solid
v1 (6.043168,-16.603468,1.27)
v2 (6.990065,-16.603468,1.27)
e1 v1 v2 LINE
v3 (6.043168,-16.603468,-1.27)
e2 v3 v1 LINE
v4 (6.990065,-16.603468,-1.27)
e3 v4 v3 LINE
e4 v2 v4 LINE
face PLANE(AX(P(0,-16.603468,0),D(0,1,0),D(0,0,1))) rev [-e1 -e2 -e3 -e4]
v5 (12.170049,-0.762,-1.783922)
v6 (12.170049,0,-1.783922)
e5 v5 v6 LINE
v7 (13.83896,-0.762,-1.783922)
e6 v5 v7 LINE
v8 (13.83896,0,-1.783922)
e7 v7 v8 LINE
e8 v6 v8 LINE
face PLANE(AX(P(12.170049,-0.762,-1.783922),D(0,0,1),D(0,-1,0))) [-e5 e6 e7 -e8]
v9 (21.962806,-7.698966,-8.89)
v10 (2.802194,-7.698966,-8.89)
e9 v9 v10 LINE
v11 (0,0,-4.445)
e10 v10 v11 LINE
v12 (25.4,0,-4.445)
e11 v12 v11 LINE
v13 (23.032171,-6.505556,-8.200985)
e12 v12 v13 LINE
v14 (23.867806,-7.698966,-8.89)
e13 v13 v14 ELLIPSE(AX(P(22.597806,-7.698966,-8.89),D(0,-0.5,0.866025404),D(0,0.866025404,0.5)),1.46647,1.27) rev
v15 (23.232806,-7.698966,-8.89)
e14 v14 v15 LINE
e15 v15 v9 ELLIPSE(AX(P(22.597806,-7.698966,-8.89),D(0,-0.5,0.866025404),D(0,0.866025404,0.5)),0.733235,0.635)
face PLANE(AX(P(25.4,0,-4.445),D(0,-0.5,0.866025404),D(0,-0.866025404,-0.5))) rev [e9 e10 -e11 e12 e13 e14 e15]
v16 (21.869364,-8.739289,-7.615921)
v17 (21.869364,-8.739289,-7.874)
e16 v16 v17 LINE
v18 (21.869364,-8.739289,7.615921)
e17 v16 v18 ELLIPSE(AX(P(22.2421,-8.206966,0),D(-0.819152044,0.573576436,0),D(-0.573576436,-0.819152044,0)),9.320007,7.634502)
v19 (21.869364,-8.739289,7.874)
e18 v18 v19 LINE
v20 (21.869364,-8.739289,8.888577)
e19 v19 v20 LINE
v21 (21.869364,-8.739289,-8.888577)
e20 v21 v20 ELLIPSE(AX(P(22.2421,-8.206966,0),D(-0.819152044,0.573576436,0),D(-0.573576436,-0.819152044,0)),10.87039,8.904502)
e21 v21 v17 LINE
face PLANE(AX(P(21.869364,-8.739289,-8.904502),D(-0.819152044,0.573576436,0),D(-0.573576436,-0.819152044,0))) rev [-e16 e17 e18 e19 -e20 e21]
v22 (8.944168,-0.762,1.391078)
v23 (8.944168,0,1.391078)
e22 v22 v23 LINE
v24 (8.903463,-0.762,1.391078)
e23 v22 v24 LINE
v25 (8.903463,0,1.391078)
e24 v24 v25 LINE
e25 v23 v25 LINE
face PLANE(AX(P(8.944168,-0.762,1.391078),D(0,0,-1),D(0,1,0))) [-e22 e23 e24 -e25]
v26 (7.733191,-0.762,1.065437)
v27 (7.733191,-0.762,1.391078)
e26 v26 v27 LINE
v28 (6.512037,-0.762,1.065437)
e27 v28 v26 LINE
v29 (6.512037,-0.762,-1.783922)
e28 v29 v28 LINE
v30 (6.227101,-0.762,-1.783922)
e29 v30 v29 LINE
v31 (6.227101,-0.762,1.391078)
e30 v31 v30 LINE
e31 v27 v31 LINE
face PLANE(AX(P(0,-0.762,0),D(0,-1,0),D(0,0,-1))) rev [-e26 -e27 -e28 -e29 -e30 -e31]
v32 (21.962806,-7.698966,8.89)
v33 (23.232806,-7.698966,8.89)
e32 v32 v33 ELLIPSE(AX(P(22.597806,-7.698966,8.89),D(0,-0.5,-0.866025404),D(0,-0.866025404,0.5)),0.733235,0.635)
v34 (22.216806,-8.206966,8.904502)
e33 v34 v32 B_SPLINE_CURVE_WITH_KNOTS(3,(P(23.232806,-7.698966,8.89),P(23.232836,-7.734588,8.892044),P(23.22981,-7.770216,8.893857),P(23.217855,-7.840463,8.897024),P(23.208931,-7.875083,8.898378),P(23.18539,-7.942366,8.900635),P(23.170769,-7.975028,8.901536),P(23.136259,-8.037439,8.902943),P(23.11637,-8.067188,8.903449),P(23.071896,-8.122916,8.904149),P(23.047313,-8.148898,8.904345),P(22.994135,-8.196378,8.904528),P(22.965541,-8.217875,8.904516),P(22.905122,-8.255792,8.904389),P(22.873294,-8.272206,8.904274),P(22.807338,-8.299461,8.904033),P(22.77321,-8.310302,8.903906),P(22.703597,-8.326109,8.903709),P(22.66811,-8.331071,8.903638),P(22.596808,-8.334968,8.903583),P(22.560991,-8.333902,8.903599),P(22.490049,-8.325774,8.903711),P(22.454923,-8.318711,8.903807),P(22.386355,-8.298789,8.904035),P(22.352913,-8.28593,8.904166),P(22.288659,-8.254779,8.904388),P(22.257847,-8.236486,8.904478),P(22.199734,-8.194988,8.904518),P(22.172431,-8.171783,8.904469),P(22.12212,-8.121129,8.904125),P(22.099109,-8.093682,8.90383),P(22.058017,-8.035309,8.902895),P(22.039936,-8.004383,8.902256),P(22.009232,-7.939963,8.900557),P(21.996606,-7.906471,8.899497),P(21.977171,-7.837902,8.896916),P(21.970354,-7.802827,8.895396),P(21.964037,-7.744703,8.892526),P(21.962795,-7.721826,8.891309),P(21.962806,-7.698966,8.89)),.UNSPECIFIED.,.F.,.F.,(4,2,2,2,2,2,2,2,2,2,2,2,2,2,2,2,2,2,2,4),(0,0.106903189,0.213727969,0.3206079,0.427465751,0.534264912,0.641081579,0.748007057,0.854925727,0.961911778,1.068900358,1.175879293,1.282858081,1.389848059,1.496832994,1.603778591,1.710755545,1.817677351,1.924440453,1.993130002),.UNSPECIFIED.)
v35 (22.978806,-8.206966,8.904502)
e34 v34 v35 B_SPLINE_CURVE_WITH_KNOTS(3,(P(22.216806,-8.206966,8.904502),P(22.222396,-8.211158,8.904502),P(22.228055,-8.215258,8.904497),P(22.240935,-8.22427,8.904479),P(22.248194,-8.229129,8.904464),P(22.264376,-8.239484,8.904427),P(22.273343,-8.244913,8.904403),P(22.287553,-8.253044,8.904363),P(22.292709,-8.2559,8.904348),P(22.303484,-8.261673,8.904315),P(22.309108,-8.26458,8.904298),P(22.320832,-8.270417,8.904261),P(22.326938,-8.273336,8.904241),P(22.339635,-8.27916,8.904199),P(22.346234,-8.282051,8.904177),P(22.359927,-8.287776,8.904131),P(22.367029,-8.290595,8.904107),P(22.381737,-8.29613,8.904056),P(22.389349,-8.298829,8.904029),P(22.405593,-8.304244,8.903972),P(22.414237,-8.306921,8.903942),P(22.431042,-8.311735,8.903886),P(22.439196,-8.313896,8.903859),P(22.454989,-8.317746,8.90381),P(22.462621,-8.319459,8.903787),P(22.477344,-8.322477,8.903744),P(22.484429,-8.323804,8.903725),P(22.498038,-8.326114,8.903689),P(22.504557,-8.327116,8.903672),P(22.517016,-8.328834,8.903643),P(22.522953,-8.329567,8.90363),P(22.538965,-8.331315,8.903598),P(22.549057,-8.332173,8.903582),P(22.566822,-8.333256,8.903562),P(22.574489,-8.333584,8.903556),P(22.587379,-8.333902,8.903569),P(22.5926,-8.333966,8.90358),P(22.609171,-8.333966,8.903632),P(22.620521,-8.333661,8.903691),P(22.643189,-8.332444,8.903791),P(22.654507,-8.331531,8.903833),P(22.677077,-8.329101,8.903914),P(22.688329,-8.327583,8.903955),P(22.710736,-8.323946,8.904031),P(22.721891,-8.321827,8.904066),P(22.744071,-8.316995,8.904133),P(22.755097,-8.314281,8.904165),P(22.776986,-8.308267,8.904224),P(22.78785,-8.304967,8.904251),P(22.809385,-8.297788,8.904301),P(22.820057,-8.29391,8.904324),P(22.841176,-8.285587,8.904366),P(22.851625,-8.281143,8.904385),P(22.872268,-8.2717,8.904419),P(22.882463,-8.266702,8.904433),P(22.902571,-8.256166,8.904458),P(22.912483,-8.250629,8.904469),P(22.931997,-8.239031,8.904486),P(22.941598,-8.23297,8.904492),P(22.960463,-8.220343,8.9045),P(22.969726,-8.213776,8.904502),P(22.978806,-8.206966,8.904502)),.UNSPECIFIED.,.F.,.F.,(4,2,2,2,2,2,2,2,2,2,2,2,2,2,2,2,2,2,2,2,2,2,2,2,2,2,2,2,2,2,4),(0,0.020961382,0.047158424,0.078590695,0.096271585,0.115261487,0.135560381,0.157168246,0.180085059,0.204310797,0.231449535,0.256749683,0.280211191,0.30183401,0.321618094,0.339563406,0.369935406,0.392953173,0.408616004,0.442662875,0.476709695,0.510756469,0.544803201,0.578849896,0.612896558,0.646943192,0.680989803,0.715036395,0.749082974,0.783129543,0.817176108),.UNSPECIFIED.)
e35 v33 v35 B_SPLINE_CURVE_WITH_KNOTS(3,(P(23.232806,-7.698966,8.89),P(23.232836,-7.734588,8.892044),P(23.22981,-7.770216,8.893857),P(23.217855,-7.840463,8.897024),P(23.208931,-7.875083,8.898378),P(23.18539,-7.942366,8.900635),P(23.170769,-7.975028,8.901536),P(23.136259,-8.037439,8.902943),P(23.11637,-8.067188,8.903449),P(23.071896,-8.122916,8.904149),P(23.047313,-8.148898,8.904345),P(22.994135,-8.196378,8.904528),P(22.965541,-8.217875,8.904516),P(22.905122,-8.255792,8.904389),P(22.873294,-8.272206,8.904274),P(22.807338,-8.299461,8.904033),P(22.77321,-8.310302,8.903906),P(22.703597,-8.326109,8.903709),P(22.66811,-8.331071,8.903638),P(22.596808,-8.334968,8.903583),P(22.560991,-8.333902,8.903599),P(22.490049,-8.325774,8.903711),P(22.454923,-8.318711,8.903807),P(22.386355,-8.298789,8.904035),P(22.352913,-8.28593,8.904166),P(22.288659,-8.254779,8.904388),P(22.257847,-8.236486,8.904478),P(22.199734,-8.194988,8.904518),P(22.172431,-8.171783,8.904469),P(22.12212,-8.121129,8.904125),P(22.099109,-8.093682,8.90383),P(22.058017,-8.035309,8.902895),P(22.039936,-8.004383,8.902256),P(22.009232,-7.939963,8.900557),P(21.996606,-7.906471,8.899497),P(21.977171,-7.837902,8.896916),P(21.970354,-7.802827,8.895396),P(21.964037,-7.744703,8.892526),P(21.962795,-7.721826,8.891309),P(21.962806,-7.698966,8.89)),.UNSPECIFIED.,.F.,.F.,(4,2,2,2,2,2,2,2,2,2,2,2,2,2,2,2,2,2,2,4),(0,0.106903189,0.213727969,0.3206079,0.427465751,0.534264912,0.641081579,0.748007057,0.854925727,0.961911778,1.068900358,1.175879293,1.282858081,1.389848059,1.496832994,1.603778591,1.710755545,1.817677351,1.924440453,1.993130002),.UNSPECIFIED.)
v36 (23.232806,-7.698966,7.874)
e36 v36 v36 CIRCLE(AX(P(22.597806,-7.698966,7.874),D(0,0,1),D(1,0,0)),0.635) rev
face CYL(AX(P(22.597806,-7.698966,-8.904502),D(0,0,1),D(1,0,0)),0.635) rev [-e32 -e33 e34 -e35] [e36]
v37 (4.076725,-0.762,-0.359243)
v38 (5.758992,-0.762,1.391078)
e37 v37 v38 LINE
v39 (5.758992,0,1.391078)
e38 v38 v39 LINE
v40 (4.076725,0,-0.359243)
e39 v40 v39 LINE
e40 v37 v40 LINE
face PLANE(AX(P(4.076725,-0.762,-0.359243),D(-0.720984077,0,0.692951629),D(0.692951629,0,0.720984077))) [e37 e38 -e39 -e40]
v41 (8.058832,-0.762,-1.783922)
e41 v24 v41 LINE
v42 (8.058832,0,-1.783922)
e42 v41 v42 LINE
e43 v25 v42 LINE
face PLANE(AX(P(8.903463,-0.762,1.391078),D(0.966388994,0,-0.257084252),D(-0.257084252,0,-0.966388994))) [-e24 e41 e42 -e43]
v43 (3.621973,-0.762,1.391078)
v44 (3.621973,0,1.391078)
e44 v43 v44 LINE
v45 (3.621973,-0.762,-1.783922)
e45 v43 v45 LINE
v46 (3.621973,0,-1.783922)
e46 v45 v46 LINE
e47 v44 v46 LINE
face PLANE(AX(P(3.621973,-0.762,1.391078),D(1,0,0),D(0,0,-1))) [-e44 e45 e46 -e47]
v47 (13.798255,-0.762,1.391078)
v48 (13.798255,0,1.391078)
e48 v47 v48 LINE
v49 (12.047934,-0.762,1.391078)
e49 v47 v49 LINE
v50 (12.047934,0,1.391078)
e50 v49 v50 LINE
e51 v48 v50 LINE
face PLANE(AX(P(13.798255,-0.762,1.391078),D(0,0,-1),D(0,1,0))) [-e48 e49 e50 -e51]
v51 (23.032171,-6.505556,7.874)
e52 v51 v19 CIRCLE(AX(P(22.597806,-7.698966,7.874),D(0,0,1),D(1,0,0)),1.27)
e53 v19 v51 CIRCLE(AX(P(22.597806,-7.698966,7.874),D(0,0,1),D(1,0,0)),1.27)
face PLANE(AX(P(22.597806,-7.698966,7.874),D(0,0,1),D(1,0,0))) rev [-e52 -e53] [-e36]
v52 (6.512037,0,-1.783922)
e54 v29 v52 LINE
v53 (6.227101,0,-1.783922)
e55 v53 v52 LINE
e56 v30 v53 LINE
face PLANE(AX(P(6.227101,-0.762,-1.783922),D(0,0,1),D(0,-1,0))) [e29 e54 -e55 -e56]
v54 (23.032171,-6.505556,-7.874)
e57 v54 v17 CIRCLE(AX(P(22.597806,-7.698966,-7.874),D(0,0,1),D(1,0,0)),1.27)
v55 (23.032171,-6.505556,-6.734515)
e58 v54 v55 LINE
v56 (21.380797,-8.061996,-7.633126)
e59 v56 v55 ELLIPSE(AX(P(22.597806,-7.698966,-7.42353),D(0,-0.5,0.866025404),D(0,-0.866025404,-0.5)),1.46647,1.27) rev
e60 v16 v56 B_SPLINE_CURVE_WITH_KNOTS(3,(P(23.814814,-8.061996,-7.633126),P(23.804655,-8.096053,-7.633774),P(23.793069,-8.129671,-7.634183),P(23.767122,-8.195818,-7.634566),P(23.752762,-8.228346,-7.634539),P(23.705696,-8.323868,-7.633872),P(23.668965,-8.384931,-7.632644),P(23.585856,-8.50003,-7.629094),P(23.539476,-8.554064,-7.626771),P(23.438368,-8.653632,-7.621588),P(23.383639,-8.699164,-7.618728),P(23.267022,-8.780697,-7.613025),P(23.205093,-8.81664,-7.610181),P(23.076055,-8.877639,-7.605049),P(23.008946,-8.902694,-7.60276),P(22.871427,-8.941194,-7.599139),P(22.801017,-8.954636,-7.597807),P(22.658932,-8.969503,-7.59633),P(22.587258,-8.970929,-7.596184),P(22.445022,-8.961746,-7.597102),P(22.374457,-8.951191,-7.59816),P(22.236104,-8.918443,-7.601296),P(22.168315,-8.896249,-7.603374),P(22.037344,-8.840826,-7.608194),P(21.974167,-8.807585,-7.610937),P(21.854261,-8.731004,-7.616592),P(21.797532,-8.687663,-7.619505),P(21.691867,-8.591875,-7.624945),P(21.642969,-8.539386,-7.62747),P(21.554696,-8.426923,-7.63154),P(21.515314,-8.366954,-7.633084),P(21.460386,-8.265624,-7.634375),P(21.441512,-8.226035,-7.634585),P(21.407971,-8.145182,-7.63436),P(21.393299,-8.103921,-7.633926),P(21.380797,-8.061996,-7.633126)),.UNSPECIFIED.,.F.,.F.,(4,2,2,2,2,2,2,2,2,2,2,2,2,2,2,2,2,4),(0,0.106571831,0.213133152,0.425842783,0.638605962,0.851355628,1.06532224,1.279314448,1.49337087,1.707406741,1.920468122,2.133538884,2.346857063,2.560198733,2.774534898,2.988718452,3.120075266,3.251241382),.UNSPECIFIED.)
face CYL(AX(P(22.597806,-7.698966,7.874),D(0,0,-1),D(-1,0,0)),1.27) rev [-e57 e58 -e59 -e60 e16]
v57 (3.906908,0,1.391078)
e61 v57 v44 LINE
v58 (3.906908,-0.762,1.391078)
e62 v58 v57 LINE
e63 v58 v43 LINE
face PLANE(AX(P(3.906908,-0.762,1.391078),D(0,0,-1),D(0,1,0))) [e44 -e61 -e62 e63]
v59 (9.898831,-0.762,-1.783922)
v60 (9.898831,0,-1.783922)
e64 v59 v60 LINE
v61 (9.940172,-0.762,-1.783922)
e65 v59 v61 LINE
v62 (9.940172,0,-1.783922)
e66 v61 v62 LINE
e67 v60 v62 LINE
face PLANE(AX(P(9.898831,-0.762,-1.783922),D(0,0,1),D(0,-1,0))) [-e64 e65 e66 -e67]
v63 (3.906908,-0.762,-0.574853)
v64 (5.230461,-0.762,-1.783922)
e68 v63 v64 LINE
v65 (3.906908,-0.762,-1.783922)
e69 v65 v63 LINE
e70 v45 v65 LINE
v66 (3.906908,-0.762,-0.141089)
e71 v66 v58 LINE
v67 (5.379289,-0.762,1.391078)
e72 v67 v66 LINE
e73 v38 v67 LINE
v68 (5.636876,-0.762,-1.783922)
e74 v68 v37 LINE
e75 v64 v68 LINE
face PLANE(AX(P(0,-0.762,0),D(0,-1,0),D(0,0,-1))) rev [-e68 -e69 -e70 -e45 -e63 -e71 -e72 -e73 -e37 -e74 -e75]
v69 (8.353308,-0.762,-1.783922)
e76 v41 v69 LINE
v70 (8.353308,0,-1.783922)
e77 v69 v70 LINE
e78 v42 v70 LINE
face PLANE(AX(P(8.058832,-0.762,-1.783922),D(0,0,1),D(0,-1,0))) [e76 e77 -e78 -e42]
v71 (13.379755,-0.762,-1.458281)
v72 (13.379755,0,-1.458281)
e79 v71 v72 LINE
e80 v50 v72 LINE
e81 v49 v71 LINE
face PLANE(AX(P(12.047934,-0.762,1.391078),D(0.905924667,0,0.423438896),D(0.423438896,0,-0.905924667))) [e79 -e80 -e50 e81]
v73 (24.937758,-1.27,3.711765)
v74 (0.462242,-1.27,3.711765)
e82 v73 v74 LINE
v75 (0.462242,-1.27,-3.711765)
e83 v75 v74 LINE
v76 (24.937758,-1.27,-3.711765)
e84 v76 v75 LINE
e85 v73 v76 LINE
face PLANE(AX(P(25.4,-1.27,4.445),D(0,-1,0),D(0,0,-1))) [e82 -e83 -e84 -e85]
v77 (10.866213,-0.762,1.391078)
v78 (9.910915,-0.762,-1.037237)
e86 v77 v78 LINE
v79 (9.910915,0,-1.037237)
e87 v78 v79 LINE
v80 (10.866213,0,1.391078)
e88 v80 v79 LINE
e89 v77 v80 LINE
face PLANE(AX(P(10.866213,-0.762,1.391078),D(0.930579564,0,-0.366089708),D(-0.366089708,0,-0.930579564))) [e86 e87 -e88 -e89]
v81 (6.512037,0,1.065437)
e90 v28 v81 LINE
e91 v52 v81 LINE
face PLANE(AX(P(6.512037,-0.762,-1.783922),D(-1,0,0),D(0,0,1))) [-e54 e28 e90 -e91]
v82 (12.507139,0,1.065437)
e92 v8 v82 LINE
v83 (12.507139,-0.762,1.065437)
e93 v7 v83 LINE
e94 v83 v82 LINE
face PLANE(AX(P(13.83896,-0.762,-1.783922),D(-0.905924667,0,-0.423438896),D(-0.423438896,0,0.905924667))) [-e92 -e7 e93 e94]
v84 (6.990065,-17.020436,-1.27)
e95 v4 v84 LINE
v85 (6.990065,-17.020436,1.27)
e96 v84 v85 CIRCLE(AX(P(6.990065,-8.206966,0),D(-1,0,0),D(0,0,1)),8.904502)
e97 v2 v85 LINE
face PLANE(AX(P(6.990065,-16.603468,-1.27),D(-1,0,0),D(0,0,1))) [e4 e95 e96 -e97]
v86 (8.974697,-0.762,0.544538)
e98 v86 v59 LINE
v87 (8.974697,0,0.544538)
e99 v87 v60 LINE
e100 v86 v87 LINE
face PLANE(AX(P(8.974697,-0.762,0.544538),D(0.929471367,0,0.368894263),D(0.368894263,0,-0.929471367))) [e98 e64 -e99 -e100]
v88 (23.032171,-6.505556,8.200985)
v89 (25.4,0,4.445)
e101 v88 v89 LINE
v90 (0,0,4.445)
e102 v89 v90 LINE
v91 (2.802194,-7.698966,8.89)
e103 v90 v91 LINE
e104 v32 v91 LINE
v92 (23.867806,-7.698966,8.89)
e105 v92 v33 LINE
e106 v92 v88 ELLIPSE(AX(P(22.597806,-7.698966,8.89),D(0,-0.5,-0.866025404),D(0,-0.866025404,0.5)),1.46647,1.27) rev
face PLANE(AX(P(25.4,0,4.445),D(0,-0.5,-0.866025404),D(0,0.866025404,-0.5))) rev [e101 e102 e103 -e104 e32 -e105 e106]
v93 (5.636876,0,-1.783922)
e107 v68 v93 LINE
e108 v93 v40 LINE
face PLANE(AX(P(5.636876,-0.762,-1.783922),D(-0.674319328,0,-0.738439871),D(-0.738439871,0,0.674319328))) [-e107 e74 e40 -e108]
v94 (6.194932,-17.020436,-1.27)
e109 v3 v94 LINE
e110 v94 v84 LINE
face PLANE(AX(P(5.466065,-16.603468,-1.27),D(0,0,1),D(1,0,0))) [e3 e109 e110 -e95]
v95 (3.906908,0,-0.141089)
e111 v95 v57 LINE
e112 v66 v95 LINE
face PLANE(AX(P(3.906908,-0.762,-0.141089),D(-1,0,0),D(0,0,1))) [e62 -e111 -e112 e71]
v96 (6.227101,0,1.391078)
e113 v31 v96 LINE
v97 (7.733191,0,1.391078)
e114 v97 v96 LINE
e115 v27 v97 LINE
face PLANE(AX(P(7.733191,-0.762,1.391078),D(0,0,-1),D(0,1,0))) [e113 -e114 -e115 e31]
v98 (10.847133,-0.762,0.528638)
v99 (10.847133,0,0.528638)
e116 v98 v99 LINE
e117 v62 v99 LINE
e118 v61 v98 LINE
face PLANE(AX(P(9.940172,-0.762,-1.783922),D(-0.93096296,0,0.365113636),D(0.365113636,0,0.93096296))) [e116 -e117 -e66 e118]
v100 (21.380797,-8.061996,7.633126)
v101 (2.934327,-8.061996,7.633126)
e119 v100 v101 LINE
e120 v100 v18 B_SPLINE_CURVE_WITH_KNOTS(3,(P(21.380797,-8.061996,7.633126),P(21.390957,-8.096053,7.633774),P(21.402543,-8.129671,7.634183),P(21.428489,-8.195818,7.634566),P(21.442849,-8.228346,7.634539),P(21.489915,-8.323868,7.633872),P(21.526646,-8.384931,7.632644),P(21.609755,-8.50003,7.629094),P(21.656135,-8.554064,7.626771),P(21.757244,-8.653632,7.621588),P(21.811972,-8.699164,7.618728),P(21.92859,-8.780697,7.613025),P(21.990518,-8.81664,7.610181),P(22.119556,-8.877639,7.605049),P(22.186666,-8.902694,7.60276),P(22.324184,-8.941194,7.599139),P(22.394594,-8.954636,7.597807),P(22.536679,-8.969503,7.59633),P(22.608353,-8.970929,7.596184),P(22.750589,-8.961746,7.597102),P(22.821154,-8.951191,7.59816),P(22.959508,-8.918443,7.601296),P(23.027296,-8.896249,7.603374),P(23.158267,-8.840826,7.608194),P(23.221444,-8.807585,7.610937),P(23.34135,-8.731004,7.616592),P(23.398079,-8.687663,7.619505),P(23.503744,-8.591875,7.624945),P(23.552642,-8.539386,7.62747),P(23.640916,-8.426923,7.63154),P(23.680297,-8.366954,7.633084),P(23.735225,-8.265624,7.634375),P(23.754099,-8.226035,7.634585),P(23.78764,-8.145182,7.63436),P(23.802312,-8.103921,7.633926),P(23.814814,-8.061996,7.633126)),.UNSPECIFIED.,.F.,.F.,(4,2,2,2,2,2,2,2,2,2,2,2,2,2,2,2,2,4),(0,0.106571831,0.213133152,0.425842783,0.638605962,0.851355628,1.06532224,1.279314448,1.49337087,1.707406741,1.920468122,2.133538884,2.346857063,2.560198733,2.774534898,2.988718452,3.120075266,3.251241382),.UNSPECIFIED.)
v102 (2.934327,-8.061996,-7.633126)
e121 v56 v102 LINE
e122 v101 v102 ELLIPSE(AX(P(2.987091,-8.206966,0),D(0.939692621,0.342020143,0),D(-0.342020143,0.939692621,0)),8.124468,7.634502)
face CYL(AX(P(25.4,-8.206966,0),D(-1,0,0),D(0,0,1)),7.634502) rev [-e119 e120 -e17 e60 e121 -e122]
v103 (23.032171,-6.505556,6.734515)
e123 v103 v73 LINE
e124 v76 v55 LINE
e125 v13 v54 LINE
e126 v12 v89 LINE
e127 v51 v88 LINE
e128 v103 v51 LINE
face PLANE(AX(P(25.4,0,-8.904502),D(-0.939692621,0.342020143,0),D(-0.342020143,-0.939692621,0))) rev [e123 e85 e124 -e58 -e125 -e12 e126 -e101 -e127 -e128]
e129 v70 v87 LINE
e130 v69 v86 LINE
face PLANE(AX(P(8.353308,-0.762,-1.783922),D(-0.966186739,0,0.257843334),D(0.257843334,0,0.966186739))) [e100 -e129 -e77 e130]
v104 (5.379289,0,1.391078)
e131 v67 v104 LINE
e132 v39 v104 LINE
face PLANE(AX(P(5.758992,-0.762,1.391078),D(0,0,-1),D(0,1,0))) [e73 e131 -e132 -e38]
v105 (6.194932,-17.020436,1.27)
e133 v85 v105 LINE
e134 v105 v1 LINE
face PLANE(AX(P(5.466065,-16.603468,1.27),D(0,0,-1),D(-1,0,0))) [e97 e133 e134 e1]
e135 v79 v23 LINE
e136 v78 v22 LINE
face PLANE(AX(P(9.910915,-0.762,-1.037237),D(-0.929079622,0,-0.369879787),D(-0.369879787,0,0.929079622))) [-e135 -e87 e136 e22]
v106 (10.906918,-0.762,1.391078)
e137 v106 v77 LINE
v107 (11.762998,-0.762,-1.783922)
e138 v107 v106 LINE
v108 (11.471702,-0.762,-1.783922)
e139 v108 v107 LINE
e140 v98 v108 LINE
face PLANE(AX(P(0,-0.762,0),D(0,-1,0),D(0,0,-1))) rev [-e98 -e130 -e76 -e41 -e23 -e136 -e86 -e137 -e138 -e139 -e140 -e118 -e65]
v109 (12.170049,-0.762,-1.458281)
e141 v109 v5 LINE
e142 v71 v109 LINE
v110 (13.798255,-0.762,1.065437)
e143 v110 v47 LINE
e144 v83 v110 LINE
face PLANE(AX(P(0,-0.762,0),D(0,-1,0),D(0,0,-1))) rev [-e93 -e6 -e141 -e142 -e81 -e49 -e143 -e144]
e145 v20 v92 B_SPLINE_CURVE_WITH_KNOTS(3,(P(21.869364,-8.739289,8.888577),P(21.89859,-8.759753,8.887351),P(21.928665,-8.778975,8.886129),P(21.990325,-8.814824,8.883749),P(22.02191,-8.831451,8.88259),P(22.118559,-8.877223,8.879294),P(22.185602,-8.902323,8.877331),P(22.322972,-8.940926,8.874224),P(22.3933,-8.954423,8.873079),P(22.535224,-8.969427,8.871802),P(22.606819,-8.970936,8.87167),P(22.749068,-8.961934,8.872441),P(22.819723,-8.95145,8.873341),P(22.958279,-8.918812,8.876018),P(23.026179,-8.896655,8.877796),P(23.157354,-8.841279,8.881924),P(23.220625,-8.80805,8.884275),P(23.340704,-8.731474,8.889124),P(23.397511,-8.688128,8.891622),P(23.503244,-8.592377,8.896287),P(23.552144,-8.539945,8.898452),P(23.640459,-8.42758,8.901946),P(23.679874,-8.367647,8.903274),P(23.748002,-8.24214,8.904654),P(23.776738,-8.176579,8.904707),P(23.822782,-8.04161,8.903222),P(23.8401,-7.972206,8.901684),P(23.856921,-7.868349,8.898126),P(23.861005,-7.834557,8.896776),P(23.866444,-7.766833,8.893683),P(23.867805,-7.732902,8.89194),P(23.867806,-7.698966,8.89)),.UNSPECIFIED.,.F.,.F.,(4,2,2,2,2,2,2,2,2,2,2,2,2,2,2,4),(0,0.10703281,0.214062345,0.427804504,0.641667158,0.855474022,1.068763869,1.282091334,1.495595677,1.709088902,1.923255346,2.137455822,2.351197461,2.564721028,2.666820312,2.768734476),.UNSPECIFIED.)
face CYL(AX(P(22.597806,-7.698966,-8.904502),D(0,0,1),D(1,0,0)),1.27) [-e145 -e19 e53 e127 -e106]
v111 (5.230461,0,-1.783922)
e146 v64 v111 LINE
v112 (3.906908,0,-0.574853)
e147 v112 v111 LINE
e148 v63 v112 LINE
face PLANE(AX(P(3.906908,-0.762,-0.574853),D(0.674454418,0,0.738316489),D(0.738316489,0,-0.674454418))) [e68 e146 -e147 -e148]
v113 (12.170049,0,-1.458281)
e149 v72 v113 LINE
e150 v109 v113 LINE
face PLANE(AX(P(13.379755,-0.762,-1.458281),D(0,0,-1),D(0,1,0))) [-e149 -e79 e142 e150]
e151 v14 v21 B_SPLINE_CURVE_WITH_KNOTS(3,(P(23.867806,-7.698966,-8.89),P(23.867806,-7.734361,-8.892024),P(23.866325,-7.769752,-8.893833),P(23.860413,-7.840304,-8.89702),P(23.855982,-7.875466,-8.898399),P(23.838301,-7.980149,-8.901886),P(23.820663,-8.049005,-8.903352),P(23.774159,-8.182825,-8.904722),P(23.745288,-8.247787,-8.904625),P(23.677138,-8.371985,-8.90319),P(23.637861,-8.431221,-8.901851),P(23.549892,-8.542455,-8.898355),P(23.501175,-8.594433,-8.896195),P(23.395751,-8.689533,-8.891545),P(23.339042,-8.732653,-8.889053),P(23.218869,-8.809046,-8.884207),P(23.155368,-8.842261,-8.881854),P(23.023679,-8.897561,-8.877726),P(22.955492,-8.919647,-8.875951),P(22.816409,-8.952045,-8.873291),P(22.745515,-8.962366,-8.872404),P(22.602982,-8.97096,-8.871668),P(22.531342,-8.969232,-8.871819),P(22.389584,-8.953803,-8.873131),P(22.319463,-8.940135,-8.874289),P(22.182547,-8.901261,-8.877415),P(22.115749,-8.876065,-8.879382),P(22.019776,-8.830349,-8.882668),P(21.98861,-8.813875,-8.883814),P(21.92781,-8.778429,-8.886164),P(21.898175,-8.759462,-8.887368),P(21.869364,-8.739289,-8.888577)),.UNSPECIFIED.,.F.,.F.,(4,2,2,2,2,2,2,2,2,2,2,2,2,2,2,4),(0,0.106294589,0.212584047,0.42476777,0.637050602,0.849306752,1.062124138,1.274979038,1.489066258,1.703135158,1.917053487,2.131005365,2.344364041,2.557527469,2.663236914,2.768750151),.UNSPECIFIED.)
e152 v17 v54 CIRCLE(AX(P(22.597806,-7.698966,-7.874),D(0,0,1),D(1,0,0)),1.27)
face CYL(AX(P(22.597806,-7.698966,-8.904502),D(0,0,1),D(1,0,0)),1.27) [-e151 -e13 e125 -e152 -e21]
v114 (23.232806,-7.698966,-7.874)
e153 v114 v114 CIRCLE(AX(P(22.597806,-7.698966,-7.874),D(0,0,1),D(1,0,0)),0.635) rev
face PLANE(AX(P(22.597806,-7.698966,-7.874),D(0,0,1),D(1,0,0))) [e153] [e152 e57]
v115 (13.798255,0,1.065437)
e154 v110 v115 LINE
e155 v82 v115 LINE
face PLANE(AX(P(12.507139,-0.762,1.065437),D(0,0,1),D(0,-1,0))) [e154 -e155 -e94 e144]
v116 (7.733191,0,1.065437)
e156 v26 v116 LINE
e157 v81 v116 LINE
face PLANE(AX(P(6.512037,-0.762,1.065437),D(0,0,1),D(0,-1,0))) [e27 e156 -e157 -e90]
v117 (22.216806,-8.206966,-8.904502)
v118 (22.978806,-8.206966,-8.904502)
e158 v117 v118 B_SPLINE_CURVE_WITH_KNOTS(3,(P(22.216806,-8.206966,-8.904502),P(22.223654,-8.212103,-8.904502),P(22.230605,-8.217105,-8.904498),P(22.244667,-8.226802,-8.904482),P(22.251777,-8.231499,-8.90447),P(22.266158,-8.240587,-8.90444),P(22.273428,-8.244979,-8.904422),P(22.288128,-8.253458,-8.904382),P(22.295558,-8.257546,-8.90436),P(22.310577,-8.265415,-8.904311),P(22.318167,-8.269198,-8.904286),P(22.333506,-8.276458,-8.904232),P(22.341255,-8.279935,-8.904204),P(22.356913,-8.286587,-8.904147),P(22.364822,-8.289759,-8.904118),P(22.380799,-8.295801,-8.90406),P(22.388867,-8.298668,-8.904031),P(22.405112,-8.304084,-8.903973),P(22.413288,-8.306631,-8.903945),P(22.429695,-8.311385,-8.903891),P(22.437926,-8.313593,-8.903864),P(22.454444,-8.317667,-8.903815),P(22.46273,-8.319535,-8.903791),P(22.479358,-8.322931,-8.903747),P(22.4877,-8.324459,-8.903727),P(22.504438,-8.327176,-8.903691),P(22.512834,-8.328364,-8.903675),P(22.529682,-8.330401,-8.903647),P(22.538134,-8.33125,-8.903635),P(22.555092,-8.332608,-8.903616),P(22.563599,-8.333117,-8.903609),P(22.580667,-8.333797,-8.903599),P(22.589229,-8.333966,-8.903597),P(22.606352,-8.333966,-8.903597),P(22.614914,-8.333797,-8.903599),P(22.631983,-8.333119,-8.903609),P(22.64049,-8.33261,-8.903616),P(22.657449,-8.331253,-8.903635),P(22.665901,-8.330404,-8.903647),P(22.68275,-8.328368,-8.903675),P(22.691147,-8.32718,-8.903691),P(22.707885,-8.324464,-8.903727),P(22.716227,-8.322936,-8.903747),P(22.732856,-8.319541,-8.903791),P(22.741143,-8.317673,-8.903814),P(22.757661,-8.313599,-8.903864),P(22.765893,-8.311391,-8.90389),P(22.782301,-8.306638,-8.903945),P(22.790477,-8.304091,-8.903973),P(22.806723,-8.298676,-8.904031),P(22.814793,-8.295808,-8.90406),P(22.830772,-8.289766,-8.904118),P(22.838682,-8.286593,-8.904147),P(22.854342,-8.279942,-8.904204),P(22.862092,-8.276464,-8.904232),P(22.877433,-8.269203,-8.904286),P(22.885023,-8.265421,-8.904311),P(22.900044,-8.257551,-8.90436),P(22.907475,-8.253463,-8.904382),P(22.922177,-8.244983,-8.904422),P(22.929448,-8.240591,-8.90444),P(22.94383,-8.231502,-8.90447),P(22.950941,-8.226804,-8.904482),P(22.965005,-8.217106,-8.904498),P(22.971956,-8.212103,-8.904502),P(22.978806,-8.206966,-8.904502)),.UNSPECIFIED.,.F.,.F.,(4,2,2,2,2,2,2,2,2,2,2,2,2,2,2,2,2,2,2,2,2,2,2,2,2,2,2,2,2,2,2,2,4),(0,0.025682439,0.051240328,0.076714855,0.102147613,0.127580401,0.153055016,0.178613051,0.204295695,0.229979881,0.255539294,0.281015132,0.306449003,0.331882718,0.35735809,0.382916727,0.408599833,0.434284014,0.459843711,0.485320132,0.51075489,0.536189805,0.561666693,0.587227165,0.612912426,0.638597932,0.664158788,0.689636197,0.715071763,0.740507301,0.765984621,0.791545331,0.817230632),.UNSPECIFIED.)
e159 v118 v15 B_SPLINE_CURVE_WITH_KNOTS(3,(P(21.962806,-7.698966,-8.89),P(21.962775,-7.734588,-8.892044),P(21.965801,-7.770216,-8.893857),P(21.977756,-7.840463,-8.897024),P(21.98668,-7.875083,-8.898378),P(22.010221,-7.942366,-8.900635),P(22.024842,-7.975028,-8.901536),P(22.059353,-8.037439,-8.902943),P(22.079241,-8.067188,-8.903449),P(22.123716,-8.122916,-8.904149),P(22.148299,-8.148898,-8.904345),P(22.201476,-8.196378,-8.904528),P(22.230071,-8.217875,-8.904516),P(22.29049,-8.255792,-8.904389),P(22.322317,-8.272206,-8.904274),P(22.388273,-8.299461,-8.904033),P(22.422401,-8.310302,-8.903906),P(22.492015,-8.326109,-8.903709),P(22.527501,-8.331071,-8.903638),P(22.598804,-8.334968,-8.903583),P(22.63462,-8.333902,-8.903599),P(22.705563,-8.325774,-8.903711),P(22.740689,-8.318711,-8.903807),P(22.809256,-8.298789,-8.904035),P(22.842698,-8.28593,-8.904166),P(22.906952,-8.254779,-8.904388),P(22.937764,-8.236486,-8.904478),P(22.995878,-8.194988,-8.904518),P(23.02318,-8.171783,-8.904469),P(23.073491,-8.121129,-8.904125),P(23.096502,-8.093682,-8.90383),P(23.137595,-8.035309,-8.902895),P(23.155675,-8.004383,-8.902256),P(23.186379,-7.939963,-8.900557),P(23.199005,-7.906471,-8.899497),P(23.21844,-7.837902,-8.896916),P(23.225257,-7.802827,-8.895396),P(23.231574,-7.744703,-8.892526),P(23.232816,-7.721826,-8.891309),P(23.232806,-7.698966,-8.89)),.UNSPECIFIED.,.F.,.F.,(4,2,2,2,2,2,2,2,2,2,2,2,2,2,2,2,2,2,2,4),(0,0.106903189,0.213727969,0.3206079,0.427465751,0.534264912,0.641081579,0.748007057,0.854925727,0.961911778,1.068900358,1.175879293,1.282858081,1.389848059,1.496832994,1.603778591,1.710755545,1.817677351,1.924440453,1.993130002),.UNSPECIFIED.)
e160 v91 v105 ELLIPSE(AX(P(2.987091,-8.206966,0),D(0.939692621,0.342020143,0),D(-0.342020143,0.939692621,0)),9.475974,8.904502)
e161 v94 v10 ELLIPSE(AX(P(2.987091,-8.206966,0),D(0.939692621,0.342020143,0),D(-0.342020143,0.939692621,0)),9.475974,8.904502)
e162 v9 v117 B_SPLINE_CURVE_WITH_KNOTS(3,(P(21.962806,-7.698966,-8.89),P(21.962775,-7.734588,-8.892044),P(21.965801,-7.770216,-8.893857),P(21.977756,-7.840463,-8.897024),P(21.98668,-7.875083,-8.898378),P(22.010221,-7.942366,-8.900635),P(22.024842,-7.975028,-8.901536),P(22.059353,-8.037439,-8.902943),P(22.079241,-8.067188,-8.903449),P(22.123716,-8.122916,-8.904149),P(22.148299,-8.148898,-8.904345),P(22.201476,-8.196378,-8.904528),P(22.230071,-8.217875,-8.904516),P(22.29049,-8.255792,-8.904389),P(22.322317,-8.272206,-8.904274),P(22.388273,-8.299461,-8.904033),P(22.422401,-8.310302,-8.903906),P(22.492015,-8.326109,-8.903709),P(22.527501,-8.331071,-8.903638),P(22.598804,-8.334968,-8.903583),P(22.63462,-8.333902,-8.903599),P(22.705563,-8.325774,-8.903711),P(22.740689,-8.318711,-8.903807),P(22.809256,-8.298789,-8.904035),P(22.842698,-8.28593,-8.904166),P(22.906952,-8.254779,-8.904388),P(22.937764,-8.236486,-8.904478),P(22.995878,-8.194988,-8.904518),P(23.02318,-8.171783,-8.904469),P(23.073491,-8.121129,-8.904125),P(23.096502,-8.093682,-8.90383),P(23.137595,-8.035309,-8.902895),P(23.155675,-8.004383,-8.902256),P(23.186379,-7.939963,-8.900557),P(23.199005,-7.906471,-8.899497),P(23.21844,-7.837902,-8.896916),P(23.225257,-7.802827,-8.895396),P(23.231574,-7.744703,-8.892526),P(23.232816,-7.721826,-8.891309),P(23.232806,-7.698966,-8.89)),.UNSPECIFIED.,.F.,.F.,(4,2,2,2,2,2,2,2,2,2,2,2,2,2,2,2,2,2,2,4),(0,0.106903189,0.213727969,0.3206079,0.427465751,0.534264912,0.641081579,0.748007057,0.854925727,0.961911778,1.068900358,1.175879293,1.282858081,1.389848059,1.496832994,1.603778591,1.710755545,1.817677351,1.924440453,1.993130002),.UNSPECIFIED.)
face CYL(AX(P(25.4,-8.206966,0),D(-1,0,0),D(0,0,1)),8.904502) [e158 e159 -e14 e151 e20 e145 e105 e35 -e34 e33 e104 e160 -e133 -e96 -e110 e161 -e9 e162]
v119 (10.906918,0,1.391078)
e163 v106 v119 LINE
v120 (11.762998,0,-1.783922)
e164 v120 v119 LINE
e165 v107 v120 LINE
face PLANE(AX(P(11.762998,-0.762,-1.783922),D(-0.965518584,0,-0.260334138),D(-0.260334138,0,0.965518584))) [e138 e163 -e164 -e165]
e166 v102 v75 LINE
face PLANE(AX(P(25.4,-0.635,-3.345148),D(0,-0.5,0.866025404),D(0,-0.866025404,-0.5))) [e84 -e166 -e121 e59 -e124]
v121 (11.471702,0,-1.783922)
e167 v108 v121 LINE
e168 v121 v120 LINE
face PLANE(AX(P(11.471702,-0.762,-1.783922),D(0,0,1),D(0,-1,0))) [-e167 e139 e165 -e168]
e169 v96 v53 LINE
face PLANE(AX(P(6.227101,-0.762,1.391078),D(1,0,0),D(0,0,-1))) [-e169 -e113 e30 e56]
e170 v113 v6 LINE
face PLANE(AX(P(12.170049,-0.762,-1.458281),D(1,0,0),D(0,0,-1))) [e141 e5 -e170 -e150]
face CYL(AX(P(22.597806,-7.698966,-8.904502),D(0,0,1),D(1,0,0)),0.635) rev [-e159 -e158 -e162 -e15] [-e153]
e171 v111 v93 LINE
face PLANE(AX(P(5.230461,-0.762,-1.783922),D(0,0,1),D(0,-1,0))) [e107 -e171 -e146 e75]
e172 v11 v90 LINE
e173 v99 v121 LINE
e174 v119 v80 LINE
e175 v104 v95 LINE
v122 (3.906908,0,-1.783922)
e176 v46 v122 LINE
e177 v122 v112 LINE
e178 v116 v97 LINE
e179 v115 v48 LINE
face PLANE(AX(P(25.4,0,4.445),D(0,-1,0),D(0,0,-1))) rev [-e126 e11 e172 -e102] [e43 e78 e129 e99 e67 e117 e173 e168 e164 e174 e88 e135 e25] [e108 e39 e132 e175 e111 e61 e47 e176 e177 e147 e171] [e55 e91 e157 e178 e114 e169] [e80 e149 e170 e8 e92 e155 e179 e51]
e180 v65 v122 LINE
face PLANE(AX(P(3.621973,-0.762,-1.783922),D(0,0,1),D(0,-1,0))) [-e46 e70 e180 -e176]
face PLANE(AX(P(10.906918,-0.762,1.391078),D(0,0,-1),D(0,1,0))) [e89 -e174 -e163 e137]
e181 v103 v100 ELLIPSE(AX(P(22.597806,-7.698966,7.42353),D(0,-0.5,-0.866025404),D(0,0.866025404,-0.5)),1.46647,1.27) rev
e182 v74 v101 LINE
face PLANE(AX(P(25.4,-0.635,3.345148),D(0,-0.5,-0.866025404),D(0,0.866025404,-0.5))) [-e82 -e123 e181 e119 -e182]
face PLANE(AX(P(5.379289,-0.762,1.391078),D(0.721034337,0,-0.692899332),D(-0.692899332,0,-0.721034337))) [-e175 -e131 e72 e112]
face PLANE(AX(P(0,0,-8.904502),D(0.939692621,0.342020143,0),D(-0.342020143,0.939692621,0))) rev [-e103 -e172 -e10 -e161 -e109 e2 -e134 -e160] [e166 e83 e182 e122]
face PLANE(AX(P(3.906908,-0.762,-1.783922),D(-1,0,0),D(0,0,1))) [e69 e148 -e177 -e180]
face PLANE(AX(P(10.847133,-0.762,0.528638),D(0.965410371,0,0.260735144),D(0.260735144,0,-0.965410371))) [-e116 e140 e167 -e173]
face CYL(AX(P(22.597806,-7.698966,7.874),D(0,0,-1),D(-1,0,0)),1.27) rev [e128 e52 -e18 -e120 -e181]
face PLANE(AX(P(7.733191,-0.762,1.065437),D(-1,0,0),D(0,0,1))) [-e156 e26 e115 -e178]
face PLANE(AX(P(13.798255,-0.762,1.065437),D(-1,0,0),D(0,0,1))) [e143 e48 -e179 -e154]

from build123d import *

# Parameters (mm, degrees)
BOSS_EXTRUDE1_DEPTH     = 25.4
SHELL1_T                = -1.27
CUT_EXTRUDE1_DEPTH      = 32.894396236
CUT_EXTRUDE1_DEPTH_BACK = 32.894396236
SKETCH2_R               = 0.635
CUT_EXTRUDE3_DEPTH      = 7.874
CUT_EXTRUDE3_DEPTH_BACK = 7.874
SKETCH4_R               = 1.27
CUT_EXTRUDE2_DEPTH      = 0.762
CUT_EXTRUDE4_START      = -17.111468296
CUT_EXTRUDE4_OUTLINE_W  = 0.990065124
CUT_EXTRUDE4_OUTLINE_H  = 2.54
CUT_EXTRUDE4_DEPTH      = 0.508


# Read off the part's stored shape, not the designer's step: Cut-Extrude4
with BuildPart() as part:
    # Sketch1 → Boss-Extrude1 (new body)
    with BuildSketch(Plane(origin=(0, 0, 0), x_dir=(0, 0, -1), z_dir=(1, 0, 0))):
        with BuildLine():
            Line((-4.445, 0), (4.445, 0))
            Line((4.445, 0), (8.89, -7.69896584))
            ThreePointArc((8.89, -7.69896584), (0, -17.111468296), (-8.89, -7.69896584))
            Line((-8.89, -7.69896584), (-4.445, 0))
        make_face()
    extrude(amount=BOSS_EXTRUDE1_DEPTH)

    # Shell1
    shell1_openings = [part.faces().sort_by_distance(p)[0] for p in [
        (25.4, -8.481857982, 0),
        (0, -8.481857982, 0),
    ]]
    offset(amount=SHELL1_T, openings=shell1_openings, kind=Kind.INTERSECTION)

    # Sketch2 → Cut-Extrude1 (cut, two sides: drawn at the far end of the back side and taken through both)
    with BuildSketch(Plane.XY.offset(-CUT_EXTRUDE1_DEPTH_BACK)):
        with Locations((22.5978056, -7.69896584)):
            Circle(SKETCH2_R)
        with BuildLine():
            Line((25.4, 0), (23.032171182, -6.505556211))
            ThreePointArc((23.032171182, -6.505556211), (23.724309358, -8.285386578), (21.869363526, -8.739288936))
            Line((21.869363526, -8.739288936), (16.007100426, -17.111468296))
            Line((16.007100426, -17.111468296), (25.4, -17.111468296))
            Line((25.4, -17.111468296), (25.4, 0))
        make_face()
        Polygon((0, 0), (6.228065124, -17.111468296), (0, -17.111468296), align=None)
    extrude(amount=CUT_EXTRUDE1_DEPTH + CUT_EXTRUDE1_DEPTH_BACK, mode=Mode.SUBTRACT)

    # Sketch4 → Cut-Extrude3 (cut, two sides: drawn at the far end of the back side and taken through both)
    with BuildSketch(Plane.XY.offset(-CUT_EXTRUDE3_DEPTH_BACK)):
        with Locations((22.5978056, -7.69896584)):
            Circle(SKETCH4_R)
    extrude(amount=CUT_EXTRUDE3_DEPTH + CUT_EXTRUDE3_DEPTH_BACK, mode=Mode.SUBTRACT)

    # Sketch3 → Cut-Extrude2 (cut)
    with BuildSketch(Plane(origin=(0, 0, 0), x_dir=(1, 0, 0), z_dir=(0, 1, 0))):
        Polygon((3.621972553, 1.783922101), (3.906908451, 1.783922101), (3.906908451, 0.57485259), (5.230461135, 1.783922101), (5.6368764, 1.783922101), (4.076725158, 0.359242614), (5.758991784, -1.391077899), (5.37928926, -1.391077899), (3.906908451, 0.141088567), (3.906908451, -1.391077899), (3.621972553, -1.391077899), align=None)
        Polygon((6.227100758, 1.783922101), (6.512036656, 1.783922101), (6.512036656, -1.065436874), (7.733190502, -1.065436874), (7.733190502, -1.391077899), (6.227100758, -1.391077899), align=None)
        Polygon((8.058831528, 1.783922101), (8.35330769, 1.783922101), (8.974696912, -0.544538436), (9.898830526, 1.783922101), (9.940171672, 1.783922101), (10.84713281, -0.528637995), (11.471702121, 1.783922101), (11.762998194, 1.783922101), (10.906918467, -1.391077899), (10.866213339, -1.391077899), (9.910914861, 1.037237405), (8.944168066, -1.391077899), (8.903462938, -1.391077899), align=None)
        Polygon((12.170049476, 1.458281075), (12.170049476, 1.783922101), (13.838959733, 1.783922101), (12.507138819, -1.065436874), (13.798254605, -1.065436874), (13.798254605, -1.391077899), (12.047934092, -1.391077899), (13.379755005, 1.458281075), align=None)
    extrude(amount=-CUT_EXTRUDE2_DEPTH, mode=Mode.SUBTRACT)

    # Cut-Extrude4 outline → Cut-Extrude4 (cut)
    with BuildSketch(Plane(origin=(0, 0, 0), x_dir=(1, 0, 0), z_dir=(0, 1, 0)).offset(CUT_EXTRUDE4_START)):
        with Locations((6.495032562, 0)):
            Rectangle(CUT_EXTRUDE4_OUTLINE_W, CUT_EXTRUDE4_OUTLINE_H)
    extrude(amount=CUT_EXTRUDE4_DEPTH, mode=Mode.SUBTRACT)


solid = part.part
